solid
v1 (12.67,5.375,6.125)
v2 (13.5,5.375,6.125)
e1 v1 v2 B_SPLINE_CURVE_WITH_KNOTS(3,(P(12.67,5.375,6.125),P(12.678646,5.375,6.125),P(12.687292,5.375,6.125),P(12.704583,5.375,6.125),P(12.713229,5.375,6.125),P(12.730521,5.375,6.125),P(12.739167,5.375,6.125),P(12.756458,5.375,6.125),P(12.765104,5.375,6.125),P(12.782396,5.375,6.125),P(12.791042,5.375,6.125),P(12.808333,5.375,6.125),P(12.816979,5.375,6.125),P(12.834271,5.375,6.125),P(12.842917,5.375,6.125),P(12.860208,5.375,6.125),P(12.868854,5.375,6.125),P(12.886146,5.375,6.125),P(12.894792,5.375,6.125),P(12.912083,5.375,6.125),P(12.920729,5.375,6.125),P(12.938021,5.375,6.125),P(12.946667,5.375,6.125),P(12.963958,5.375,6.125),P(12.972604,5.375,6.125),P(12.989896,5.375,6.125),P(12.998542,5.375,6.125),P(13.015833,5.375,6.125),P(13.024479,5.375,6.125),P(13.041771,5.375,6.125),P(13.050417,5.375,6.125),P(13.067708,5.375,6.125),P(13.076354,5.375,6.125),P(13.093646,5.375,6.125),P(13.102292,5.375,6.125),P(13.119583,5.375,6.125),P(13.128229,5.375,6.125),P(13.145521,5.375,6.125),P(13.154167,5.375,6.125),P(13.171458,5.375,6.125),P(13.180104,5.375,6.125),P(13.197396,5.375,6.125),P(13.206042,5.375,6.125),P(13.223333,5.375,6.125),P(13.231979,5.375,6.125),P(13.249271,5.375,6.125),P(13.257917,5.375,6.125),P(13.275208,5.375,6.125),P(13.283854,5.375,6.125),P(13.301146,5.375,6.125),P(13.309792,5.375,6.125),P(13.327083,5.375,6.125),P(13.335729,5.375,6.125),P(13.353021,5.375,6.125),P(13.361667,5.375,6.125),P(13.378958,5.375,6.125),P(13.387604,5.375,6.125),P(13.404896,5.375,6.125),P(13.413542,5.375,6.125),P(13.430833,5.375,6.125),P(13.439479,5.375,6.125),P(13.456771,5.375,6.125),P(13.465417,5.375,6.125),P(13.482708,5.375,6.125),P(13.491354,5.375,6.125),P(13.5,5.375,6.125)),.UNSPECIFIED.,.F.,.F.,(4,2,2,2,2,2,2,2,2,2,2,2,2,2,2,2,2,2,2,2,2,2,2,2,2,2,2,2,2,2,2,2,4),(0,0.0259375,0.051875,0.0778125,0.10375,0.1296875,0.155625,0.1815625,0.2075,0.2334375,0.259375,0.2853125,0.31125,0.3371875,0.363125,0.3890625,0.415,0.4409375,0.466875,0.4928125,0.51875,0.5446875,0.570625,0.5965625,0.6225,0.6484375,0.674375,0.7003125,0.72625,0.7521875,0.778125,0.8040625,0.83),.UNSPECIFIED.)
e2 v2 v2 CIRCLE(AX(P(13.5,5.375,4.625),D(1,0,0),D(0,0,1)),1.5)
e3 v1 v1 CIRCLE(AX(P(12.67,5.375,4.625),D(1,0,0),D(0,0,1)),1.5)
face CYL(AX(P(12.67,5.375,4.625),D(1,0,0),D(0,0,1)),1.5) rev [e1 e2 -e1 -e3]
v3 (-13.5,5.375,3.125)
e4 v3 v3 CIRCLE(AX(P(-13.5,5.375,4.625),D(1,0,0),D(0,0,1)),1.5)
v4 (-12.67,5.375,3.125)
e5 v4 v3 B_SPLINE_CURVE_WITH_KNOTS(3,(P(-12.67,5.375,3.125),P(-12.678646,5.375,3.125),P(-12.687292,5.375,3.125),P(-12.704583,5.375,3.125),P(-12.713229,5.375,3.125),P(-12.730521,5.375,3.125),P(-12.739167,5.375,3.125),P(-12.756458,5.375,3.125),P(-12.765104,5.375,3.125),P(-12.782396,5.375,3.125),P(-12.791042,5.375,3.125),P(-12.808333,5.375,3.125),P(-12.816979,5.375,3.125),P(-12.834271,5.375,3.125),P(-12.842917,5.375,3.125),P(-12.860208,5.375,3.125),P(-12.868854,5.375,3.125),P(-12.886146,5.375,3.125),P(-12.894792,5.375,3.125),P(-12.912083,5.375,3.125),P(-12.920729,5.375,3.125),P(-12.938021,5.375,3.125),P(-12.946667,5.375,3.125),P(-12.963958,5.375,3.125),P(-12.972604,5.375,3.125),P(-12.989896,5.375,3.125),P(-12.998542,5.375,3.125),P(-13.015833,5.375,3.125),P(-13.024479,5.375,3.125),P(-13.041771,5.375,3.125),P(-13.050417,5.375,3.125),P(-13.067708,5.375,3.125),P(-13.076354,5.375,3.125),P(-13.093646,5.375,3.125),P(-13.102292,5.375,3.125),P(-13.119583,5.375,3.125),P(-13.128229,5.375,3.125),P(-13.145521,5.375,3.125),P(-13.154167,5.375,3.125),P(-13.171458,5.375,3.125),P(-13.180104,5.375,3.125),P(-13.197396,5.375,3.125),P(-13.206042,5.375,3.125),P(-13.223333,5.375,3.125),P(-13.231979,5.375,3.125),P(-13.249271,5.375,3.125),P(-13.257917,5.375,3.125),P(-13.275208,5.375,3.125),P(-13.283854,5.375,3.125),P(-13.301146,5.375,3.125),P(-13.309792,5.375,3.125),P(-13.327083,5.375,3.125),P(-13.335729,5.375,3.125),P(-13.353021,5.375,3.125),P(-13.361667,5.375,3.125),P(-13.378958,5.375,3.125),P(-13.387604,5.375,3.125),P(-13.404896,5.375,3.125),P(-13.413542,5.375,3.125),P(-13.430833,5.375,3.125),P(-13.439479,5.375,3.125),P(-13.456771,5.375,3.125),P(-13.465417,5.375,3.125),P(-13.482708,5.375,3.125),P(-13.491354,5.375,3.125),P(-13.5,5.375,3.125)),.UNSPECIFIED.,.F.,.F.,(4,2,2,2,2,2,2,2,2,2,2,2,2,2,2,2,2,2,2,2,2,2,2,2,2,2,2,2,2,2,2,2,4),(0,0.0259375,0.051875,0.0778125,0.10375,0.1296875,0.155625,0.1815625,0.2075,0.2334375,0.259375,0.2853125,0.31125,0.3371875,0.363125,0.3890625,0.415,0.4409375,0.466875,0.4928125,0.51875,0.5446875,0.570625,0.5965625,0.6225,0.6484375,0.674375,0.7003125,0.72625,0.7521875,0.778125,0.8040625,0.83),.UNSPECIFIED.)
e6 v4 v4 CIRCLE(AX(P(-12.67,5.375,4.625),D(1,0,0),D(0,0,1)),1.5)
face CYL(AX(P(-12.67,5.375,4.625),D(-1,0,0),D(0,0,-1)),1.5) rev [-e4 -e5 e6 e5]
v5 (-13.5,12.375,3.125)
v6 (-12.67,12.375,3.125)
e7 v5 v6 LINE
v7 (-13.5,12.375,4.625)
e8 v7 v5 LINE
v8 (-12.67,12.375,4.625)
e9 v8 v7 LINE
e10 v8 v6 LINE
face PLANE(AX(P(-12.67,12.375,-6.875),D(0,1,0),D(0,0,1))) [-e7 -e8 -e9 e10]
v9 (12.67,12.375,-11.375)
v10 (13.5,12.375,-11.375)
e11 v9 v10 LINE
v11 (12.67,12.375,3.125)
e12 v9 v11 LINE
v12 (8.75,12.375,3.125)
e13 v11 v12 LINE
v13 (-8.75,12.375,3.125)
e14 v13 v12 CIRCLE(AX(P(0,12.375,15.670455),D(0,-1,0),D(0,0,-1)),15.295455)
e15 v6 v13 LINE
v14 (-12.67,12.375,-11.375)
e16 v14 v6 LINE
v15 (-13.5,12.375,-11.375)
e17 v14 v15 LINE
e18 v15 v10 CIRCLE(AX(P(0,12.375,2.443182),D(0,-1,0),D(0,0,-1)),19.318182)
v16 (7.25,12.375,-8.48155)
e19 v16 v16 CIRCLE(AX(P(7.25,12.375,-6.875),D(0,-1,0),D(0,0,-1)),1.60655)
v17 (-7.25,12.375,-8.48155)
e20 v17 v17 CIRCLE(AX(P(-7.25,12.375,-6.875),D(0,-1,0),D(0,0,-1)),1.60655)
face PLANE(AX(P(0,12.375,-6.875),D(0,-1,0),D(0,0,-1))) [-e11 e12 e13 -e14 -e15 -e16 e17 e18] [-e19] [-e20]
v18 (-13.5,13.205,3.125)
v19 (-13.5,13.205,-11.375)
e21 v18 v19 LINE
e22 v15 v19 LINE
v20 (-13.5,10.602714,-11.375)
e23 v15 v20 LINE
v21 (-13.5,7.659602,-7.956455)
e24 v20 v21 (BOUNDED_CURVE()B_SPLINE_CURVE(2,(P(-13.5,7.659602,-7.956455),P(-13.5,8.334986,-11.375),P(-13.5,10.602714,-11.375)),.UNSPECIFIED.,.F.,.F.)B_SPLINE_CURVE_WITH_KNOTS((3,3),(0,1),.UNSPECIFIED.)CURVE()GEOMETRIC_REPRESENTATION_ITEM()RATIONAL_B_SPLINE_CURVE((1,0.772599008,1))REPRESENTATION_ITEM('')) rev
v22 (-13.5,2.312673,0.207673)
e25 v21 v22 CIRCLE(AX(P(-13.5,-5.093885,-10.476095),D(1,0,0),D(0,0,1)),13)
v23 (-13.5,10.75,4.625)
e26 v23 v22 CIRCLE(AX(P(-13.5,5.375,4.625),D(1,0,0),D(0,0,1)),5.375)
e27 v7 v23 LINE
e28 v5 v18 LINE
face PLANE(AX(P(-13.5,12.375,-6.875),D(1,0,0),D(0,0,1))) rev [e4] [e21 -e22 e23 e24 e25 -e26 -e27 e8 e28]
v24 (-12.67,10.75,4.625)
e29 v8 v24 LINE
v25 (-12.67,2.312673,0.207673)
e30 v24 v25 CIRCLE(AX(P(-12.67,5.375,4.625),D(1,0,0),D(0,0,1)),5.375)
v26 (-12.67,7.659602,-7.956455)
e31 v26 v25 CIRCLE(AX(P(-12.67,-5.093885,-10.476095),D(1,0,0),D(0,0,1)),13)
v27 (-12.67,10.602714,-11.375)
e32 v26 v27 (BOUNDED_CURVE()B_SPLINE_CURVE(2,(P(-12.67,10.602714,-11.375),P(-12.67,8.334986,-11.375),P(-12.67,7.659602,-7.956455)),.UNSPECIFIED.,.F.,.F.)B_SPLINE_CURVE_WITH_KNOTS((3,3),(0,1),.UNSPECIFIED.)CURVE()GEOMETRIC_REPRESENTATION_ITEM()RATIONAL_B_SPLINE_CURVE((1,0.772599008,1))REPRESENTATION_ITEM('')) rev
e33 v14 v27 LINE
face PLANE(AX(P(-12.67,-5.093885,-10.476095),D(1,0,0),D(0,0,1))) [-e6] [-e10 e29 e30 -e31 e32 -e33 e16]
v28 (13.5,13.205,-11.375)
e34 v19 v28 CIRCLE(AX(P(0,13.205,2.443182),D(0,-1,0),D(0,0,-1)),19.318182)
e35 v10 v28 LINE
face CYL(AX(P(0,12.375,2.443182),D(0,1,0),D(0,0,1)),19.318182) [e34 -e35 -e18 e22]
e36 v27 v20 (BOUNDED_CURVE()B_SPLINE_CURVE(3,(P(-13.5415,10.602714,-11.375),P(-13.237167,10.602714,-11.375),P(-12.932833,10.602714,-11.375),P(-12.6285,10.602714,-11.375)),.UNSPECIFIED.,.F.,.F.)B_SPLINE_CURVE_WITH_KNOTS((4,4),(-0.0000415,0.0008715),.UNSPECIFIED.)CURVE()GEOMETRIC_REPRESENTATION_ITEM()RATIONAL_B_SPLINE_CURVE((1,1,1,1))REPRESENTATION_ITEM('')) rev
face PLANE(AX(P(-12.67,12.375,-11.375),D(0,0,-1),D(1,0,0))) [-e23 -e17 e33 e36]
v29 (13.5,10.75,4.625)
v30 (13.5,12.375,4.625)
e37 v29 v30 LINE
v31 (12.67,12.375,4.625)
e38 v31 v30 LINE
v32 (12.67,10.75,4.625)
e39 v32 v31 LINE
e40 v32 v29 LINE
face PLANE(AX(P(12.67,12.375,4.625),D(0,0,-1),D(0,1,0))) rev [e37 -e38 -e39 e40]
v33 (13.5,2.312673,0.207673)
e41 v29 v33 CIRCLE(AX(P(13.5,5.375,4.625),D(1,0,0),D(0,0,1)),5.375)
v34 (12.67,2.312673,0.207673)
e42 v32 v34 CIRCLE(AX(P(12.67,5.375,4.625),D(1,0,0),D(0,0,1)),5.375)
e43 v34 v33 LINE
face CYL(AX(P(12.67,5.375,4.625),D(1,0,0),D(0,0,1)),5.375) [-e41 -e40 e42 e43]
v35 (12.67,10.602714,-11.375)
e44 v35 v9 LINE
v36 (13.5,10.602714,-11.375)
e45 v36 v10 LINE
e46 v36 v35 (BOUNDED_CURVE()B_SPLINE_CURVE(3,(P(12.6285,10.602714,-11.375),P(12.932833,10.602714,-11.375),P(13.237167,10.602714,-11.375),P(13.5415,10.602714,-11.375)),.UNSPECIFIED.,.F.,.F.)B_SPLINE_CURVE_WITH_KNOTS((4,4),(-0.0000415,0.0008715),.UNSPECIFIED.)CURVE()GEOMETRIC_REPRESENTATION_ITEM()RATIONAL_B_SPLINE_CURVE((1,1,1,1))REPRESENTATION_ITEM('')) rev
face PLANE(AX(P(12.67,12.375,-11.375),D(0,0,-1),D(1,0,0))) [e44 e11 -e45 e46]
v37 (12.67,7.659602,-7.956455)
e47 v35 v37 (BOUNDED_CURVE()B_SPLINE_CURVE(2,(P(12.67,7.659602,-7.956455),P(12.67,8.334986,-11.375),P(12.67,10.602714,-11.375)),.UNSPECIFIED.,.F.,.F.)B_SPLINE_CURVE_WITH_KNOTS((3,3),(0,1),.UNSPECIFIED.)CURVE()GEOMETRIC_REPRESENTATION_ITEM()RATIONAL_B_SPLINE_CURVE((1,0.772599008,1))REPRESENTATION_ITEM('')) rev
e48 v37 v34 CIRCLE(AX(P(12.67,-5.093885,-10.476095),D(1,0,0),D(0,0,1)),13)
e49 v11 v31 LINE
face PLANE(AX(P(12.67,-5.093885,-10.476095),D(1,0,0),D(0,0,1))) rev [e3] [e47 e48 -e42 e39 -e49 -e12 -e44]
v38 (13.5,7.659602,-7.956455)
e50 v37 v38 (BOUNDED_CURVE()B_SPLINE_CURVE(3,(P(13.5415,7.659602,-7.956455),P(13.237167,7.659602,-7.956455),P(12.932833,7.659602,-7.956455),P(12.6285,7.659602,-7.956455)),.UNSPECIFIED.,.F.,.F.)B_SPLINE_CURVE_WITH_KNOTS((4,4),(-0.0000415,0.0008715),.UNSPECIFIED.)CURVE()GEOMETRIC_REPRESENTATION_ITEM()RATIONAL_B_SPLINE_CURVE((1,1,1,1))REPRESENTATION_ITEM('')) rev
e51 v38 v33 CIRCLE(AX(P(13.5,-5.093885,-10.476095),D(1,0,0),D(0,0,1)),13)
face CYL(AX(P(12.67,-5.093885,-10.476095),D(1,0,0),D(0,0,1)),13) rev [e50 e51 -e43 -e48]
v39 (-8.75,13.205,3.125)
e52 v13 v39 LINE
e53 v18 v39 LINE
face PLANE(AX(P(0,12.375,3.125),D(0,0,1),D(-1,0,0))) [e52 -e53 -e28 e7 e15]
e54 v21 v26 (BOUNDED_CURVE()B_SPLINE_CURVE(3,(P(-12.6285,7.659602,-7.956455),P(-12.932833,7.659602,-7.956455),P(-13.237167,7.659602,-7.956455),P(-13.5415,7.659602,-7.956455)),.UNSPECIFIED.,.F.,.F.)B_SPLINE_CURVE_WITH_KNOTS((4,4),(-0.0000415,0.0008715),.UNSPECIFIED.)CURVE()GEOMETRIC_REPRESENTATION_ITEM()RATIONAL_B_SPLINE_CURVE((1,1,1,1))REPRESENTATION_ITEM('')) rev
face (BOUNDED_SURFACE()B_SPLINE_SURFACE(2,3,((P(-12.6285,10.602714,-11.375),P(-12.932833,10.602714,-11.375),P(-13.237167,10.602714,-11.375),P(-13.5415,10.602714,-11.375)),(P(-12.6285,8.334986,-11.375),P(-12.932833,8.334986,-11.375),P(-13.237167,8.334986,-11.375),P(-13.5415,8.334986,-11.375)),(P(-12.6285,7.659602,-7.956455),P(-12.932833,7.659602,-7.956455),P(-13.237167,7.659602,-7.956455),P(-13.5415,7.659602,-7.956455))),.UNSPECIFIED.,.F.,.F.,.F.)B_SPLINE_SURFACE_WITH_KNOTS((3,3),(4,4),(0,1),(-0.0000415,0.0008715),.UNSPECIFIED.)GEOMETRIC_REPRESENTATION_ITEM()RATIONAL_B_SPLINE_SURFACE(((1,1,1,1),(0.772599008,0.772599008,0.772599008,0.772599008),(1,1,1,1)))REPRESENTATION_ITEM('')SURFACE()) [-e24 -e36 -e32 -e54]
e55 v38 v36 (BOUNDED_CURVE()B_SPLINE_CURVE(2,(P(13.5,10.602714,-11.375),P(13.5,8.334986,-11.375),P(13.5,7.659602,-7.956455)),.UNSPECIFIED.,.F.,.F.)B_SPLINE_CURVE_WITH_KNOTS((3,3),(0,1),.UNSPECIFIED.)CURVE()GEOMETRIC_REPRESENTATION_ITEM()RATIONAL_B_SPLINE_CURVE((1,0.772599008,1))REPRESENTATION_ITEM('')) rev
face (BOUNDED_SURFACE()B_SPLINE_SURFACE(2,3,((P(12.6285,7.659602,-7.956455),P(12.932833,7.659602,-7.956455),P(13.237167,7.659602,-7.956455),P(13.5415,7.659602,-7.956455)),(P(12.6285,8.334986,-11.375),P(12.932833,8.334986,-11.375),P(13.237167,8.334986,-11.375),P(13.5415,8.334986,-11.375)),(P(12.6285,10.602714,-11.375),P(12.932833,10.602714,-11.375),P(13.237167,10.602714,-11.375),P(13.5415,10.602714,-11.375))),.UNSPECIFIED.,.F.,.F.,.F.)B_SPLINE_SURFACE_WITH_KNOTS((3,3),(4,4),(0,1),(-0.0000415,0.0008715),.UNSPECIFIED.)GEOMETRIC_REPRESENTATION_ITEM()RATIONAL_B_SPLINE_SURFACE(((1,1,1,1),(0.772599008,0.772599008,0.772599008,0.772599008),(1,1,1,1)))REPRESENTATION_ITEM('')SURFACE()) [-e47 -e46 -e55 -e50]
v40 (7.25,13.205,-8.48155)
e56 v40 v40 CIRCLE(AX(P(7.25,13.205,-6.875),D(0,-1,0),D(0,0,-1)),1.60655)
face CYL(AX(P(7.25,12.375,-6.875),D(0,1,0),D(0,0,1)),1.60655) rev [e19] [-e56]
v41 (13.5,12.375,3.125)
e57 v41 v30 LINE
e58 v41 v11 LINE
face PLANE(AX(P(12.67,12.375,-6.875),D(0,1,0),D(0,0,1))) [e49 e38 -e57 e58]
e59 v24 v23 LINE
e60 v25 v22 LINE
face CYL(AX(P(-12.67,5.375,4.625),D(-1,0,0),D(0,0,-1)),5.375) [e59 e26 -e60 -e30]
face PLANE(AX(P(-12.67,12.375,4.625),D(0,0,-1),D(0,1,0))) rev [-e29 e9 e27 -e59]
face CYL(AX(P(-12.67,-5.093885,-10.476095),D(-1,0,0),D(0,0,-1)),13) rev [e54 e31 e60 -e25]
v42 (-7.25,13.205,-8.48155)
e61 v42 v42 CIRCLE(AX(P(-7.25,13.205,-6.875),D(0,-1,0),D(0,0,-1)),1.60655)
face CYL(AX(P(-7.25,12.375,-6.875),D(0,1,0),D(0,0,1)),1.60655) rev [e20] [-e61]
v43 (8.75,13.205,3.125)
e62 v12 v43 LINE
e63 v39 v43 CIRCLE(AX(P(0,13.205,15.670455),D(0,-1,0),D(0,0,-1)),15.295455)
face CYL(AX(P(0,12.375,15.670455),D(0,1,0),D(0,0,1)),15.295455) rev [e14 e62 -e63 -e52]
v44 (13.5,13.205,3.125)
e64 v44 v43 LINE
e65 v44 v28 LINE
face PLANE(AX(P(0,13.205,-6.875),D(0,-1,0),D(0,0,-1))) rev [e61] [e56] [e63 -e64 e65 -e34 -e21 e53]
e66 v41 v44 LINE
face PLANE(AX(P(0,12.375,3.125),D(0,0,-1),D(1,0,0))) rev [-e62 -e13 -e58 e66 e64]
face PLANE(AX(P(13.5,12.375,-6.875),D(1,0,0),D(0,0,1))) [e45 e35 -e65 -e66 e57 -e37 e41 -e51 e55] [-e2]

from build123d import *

# Parameters (mm, degrees)
SKETCH1_R             = 1.60655
BOSS_EXTRUDE1_DEPTH   = 0.83
BOSS_EXTRUDE4_START   = 13.5
SKETCH3_R             = 1.5
BOSS_EXTRUDE4_DEPTH   = 0.83
BOSS_EXTRUDE5_START   = -12.67
SKETCH3_5_R           = 1.5
BOSS_EXTRUDE5_DEPTH   = 0.83
BODY_MOVE_COPY1_ANGLE = 180


with BuildPart() as part:
    # Sketch1 → Boss-Extrude1 (new body)
    with BuildSketch(Plane(origin=(0, 0, 0), x_dir=(1, 0, 0), z_dir=(0, 1, 0))):
        with BuildLine():
            Line((13.5, -4.5), (13.5, 10))
            Line((13.5, 10), (8.75, 10))
            ThreePointArc((8.75, 10), (0, 7.25), (-8.75, 10))
            Line((-8.75, 10), (-13.5, 10))
            Line((-13.5, 10), (-13.5, -4.5))
            ThreePointArc((-13.5, -4.5), (-7.288689869, -8.572238768), (0, -10))
            ThreePointArc((0, -10), (7.288689869, -8.572238768), (13.5, -4.5))
        make_face()
        with Locations(Location((-7.25, 0, 0), (0, 0, 90))):
            Circle(SKETCH1_R, mode=Mode.SUBTRACT)
        with Locations(Location((7.25, 0, 0), (0, 0, 90))):
            Circle(SKETCH1_R, mode=Mode.SUBTRACT)
    extrude(amount=BOSS_EXTRUDE1_DEPTH)

    # Sketch3 → Boss-Extrude4 (add)
    with BuildSketch(Plane(origin=(0, 0, 0), x_dir=(0, 0, -1), z_dir=(1, 0, 0)).offset(BOSS_EXTRUDE4_START)):
        with BuildLine():
            Line((-4.5, 0.83), (10, 0.83))
            Line((10, 0.83), (11.5, 0.83))
            Line((11.5, 0.83), (11.5, 2.455))
            ThreePointArc((11.5, 2.455), (16.261860542, 10.323052182), (7.082672814, 10.892326816))
            ThreePointArc((7.082672814, 10.892326816), (2.026582548, 6.580128686), (-4.5, 5.33))
            Line((-4.5, 5.33), (-4.5, 0.83))
        make_face()
        with Locations((11.5, 7.83)):
            Circle(SKETCH3_R, mode=Mode.SUBTRACT)
    extrude(amount=-BOSS_EXTRUDE4_DEPTH)

    # Sketch3<5> → Boss-Extrude5 (add)
    with BuildSketch(Plane(origin=(0, 0, 0), x_dir=(0, 0, -1), z_dir=(1, 0, 0)).offset(BOSS_EXTRUDE5_START)):
        with BuildLine():
            Line((-4.5, 0.83), (10, 0.83))
            Line((10, 0.83), (11.5, 0.83))
            Line((11.5, 0.83), (11.5, 2.455))
            ThreePointArc((11.5, 2.455), (16.261860542, 10.323052182), (7.082672814, 10.892326816))
            ThreePointArc((7.082672814, 10.892326816), (2.026582548, 6.580128686), (-4.5, 5.33))
            Line((-4.5, 5.33), (-4.5, 0.83))
        make_face()
        with Locations((11.5, 7.83)):
            Circle(SKETCH3_5_R, mode=Mode.SUBTRACT)
    extrude(amount=-BOSS_EXTRUDE5_DEPTH)

    # Fillet4
    # an asymmetric fillet: 4, 3 mm, written as the material it takes off along each edge
    with BuildSketch(Plane(origin=(-4.106690229, 5.33, 4.5), x_dir=(0, -1, 0), z_dir=(-1, 0, 0))) as fillet4_piece_1:
        with BuildLine():
            Bezier((2.727713921, 0), (0.459985745, 0), (-0.21539832, -3.418544638), weights=[1, 0.772599008, 1])
            ThreePointArc((-0.21539832, -3.418544638), (0.005386199, -1.716397689), (0, 0))
            Line((0, 0), (2.727713921, 0))
        make_face()
    extrude(amount=17.956619542, mode=Mode.SUBTRACT)

    # Fillet5
    # an asymmetric fillet: 4, 3 mm, written as the material it takes off along each edge
    with BuildSketch(Plane(origin=(22.063309771, 5.33, 4.5), x_dir=(0, -1, 0), z_dir=(-1, 0, 0))) as fillet5_piece_1:
        with BuildLine():
            Bezier((2.727713921, 0), (0.459985745, 0), (-0.21539832, -3.418544638), weights=[1, 0.772599008, 1])
            ThreePointArc((-0.21539832, -3.418544638), (0.005386199, -1.716397689), (0, 0))
            Line((0, 0), (2.727713921, 0))
        make_face()
    extrude(amount=17.956619542, mode=Mode.SUBTRACT)


with BuildPart() as part_1:
    # Body-Move/Copy1: moved
    add(part.part.moved(Location((0, 0, 0))).rotate(Axis((0, 6.6025, -3.4375), (1, 0, 0)), BODY_MOVE_COPY1_ANGLE))


solid = part_1.part
